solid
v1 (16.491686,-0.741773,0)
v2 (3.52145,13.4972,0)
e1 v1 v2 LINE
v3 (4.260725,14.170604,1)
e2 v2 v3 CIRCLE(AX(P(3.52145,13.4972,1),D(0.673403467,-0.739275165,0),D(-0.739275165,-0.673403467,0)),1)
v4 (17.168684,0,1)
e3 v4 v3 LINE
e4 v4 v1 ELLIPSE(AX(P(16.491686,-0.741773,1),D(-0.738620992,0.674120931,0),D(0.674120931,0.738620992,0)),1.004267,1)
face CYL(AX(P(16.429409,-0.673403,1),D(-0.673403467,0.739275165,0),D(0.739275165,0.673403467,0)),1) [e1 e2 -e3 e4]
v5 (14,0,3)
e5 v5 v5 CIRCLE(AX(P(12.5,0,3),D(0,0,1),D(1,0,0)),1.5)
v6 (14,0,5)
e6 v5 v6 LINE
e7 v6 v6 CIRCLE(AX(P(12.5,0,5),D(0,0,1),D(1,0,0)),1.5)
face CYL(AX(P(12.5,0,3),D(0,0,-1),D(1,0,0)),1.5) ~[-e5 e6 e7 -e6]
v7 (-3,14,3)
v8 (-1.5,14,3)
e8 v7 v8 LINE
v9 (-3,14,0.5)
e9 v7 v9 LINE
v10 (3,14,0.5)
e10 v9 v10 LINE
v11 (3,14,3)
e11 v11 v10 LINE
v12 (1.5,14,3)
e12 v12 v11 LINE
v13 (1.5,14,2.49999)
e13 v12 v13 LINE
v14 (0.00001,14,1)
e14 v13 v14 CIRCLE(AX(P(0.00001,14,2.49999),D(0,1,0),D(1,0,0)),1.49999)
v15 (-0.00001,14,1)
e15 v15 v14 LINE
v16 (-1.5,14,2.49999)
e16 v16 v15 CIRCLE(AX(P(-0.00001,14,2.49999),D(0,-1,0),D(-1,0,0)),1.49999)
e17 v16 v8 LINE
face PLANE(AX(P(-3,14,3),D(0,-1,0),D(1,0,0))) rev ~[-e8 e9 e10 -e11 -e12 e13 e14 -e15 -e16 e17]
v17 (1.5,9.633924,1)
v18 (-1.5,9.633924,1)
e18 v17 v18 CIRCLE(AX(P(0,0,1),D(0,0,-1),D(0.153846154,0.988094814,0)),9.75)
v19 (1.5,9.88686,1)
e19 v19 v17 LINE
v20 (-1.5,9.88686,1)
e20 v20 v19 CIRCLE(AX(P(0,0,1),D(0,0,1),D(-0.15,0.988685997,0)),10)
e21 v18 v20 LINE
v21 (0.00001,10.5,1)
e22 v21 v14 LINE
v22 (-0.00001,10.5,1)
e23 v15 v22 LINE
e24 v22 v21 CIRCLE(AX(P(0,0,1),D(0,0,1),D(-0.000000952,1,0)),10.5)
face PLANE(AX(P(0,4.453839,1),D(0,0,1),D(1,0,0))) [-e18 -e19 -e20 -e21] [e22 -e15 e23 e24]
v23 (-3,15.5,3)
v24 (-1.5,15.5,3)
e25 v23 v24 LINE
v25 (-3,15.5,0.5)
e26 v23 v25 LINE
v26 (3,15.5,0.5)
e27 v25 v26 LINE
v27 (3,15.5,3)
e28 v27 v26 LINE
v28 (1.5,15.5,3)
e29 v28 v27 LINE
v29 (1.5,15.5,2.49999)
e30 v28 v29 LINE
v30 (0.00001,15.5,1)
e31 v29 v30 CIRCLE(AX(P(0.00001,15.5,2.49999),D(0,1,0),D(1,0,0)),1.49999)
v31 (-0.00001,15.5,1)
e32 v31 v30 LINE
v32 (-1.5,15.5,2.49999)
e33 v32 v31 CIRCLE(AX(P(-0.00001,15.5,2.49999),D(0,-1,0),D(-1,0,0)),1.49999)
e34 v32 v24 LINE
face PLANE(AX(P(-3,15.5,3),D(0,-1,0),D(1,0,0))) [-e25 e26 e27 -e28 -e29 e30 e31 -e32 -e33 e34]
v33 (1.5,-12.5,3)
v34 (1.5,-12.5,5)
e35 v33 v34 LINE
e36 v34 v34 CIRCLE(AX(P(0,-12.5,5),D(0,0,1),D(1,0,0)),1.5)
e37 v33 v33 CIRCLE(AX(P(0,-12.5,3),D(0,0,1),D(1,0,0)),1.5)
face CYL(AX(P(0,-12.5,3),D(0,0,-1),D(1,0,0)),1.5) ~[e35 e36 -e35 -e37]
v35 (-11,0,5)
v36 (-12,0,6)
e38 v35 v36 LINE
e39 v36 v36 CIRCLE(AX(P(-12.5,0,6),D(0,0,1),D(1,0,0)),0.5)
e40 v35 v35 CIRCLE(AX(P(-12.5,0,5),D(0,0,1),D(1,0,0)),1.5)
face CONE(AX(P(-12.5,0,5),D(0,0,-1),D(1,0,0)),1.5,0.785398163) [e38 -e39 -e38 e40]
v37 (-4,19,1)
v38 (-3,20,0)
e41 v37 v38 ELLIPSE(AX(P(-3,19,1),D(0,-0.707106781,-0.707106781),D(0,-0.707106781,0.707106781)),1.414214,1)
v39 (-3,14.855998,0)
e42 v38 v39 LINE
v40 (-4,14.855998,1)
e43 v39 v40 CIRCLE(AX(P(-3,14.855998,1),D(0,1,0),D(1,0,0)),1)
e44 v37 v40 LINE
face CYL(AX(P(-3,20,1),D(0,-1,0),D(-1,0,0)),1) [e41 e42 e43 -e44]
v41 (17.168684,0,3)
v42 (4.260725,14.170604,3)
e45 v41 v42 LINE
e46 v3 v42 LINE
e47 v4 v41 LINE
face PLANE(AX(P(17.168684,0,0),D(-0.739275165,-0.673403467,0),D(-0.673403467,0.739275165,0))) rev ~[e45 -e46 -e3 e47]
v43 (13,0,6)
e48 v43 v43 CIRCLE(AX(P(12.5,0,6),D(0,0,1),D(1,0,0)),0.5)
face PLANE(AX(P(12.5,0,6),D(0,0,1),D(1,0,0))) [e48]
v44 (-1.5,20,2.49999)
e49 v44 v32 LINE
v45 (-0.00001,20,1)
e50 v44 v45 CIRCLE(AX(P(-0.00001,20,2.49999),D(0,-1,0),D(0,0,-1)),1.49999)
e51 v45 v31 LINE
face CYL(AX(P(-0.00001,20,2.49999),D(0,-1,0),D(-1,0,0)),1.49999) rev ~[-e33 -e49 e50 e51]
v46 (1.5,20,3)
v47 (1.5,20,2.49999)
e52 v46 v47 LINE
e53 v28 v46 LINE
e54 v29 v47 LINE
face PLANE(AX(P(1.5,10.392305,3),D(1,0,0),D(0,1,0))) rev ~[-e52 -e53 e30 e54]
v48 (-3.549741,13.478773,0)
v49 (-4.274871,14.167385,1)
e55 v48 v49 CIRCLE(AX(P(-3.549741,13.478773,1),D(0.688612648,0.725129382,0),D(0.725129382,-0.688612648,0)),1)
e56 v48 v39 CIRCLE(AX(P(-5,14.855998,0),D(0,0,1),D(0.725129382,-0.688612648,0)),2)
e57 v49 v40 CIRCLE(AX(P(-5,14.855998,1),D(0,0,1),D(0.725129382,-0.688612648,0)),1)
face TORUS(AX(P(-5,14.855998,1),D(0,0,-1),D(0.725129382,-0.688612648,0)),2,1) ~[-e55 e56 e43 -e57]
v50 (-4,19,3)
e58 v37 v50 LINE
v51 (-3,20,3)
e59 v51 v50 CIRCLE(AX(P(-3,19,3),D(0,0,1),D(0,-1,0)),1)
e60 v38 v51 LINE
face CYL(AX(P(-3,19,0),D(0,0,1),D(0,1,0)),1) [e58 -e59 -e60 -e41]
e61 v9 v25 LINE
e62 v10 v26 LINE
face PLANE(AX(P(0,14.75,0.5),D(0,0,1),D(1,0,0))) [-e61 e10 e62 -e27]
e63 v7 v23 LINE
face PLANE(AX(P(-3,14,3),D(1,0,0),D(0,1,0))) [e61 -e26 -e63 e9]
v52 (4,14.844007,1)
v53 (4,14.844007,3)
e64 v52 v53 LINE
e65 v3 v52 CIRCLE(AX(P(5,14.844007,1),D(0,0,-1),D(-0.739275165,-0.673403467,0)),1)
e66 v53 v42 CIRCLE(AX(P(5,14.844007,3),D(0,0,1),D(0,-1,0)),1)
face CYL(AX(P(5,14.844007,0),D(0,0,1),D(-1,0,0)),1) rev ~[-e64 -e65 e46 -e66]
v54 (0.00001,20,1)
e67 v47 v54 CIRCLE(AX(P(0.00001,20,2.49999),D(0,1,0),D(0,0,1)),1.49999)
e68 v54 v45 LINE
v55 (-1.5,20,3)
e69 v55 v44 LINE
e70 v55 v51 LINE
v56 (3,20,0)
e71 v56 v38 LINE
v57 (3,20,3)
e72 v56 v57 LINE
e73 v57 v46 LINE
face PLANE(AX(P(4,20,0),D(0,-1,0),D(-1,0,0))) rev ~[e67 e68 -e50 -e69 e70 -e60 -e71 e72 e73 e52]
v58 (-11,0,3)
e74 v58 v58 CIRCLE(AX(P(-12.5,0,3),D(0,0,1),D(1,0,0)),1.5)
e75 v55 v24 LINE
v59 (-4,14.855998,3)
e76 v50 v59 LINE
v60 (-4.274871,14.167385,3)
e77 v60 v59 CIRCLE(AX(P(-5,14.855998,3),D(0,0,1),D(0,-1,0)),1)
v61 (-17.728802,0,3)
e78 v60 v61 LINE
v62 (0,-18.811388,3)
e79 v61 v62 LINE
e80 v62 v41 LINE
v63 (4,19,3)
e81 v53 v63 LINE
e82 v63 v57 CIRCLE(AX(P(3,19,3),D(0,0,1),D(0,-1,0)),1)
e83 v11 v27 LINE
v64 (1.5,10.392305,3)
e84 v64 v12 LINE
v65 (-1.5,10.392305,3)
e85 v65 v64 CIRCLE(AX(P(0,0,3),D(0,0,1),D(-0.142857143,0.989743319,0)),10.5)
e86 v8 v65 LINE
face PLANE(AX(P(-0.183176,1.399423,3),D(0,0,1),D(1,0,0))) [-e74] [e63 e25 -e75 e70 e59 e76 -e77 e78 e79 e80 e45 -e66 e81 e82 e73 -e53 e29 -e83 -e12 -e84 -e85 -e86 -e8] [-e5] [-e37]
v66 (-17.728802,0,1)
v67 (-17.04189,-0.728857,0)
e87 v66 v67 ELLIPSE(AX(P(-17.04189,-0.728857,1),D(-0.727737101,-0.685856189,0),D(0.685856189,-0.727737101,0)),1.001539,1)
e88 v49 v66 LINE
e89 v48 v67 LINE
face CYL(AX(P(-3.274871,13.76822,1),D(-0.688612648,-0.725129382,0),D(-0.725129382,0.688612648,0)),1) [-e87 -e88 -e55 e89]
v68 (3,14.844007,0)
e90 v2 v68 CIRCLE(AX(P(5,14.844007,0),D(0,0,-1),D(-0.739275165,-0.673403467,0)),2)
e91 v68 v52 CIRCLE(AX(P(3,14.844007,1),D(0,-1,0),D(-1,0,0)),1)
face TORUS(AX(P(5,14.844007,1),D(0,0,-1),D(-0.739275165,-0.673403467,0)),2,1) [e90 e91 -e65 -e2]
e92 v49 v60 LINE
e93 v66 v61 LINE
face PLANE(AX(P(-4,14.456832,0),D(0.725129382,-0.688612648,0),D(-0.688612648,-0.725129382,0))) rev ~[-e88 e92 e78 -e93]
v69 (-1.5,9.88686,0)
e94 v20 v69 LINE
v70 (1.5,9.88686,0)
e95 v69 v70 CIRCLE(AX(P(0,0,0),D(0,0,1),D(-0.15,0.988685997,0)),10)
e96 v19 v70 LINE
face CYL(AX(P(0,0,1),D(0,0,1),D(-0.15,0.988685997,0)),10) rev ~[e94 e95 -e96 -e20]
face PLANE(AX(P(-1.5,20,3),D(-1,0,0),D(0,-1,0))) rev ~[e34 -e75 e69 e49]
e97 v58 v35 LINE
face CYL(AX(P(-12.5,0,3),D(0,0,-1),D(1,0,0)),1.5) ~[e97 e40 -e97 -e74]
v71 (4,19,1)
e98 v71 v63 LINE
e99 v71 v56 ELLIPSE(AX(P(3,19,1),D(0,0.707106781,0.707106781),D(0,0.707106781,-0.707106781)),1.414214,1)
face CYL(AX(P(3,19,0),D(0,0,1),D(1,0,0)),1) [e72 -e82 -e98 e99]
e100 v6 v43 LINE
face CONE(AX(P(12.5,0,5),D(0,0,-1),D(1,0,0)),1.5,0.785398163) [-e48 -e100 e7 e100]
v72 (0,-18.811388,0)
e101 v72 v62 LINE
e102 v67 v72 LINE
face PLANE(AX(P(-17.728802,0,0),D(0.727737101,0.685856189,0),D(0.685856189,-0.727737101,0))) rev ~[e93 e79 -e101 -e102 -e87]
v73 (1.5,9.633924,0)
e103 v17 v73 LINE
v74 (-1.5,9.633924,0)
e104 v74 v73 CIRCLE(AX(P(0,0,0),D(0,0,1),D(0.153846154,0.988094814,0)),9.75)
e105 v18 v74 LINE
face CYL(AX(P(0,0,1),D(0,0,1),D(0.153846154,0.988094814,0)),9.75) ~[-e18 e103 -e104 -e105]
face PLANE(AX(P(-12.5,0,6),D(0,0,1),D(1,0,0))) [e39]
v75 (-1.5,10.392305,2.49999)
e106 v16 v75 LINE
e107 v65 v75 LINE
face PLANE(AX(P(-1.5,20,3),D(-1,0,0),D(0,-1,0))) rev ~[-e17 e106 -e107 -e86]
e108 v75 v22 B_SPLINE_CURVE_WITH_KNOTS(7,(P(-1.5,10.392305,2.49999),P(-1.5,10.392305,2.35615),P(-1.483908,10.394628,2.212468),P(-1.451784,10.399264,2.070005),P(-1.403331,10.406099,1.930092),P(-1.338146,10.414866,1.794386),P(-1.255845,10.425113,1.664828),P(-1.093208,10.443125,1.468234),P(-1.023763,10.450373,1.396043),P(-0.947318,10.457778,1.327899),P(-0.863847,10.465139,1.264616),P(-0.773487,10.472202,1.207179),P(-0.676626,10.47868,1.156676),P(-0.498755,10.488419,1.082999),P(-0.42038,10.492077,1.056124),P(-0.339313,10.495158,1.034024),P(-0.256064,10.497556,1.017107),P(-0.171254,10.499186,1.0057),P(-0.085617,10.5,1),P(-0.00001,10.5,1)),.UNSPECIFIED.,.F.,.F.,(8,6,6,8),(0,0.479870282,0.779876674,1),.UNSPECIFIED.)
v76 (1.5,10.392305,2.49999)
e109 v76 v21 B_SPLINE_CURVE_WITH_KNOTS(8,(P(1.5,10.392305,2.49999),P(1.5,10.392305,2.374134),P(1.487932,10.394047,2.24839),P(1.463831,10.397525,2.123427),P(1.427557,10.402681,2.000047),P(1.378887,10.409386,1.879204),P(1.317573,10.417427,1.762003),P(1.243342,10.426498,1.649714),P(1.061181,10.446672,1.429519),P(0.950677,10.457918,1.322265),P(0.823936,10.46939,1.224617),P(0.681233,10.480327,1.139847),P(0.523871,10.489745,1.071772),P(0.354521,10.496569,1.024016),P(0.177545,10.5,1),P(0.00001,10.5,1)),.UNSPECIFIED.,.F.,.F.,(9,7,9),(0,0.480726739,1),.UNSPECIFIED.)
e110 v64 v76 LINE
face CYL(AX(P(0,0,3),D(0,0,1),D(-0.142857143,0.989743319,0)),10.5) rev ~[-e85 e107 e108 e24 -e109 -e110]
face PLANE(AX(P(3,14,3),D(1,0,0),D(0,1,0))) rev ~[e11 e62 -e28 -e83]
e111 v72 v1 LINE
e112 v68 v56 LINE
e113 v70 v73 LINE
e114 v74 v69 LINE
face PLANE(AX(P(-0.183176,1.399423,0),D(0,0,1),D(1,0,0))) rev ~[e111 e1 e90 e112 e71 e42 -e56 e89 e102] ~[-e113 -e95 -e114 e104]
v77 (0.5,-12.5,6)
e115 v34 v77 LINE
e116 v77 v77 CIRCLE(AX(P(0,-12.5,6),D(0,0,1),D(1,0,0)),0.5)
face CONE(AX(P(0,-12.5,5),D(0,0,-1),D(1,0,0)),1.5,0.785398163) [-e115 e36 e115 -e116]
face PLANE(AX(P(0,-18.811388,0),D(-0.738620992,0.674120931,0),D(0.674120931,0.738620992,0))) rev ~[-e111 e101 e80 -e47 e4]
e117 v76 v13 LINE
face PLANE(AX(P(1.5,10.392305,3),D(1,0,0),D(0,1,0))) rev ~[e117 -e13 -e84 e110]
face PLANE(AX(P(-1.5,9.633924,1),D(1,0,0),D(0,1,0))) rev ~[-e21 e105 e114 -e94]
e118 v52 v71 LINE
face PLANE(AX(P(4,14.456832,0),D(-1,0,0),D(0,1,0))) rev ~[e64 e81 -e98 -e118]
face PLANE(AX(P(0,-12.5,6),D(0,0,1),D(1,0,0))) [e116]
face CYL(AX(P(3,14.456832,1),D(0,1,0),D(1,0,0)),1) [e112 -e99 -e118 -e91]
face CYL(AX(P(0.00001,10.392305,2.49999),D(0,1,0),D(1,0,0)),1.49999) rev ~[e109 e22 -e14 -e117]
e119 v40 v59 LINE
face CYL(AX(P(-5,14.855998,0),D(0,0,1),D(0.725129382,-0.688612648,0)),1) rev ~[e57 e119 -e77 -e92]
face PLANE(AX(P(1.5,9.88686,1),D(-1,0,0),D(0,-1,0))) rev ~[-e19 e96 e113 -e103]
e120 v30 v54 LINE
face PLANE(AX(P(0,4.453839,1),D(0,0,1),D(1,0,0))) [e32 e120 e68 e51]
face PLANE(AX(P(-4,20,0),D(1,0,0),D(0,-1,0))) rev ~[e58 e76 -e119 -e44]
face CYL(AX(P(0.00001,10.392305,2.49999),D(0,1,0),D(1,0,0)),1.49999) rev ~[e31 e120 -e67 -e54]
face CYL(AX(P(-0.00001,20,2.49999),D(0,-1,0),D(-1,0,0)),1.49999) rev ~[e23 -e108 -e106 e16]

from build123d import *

# Parameters (mm, degrees)
F1_DEPTH  = 3
F3_DEPTH  = 2
F4_R      = 1.5
F5_DEPTH  = 3
F6_SIZE   = 1
F7_R      = 1
F9_DEPTH  = 1.0010001
F10_R     = 1.49999
F11_W     = 6
F11_H     = 1.5
F12_DEPTH = 2.5


# Not quite as in the source:
# - a fillet or chamfer is up to 0.001 mm smaller than in the source, because OpenCascade refuses the exact size


with BuildPart() as f1:
    # F0 (on Top) → F1 (new body)
    with BuildSketch(Plane.XY):
        Polygon((4, 20), (-4, 20), (-4, 14.4568322948), (-17.7288018167, 0), (0, -18.8113879412), (17.1686839312, 0), (4, 14.4568322948), align=None)
    extrude(amount=F1_DEPTH)

    # F2 (on face) → F3 (cut)
    with BuildSketch(Plane.XY.offset(3)):
        with BuildLine():
            Line((1.5, 20), (-1.5, 20))
            Line((-1.5, 20), (-1.5, 10.3923048454))
            ThreePointArc((-1.5, 10.3923048454), (0, -10.5), (1.5, 10.3923048454))
            Line((1.5, 10.3923048454), (1.5, 20))
        make_face()
    extrude(amount=-F3_DEPTH, mode=Mode.SUBTRACT)

    # F4 (on face) → F5 (join)
    with BuildSketch(Plane.XY.offset(3)):
        with Locations((12.5, 0)):
            Circle(F4_R)
        with Locations((-12.5, 0)):
            Circle(F4_R)
        with Locations((0, -12.5)):
            Circle(F4_R)
    extrude(amount=F5_DEPTH)

    # F6
    f6_edges = [f1.edges().sort_by_distance(p)[0] for p in [
        (-14, 0, 6),
        (-1.5, -12.5, 6),
        (11, 0, 6),
    ]]
    chamfer(f6_edges, length=F6_SIZE)

    # F7
    f7_edges = [f1.edges().sort_by_distance(p)[0] for p in [
        (4, 17.228416, 0),
        (-4, 17.228416, 0),
        (-4, 14.456832, 1.5),
        (-10.864401, 7.228416, 0),
        (-4, 20, 1.5),
        (4, 14.456832, 1.5),
        (10.584342, 7.228416, 0),
        (4, 20, 1.5),
    ]]
    fillet(f7_edges, radius=F7_R)

    # F8 (on face) → F9 (cut, through all)
    with BuildSketch(Plane.XY.offset(1)):
        with BuildLine():
            Line((-1.5, 9.633924434), (-1.5, 9.8868599666))
            ThreePointArc((-1.5, 9.8868599666), (0, -10), (1.5, 9.8868599666))
            Line((1.5, 9.8868599666), (1.5, 9.633924434))
            ThreePointArc((1.5, 9.633924434), (0, -9.75), (-1.5, 9.633924434))
        make_face()
    extrude(amount=-F9_DEPTH, mode=Mode.SUBTRACT)

    # F10 (radius 1.5 in the source; OpenCascade refuses exactly that, so slightly less here)
    f10_edges = [f1.edges().sort_by_distance(p)[0] for p in [
        (1.5, 15.196152, 1),
        (-1.5, 15.196152, 1),
    ]]
    fillet(f10_edges, radius=F10_R)

    # F11 (on face) → F12 (cut)
    with BuildSketch(Plane.XY.offset(3)):
        with Locations((0, 14.75)):
            Rectangle(F11_W, F11_H)
    extrude(amount=-F12_DEPTH, mode=Mode.SUBTRACT)


solid = f1.part
